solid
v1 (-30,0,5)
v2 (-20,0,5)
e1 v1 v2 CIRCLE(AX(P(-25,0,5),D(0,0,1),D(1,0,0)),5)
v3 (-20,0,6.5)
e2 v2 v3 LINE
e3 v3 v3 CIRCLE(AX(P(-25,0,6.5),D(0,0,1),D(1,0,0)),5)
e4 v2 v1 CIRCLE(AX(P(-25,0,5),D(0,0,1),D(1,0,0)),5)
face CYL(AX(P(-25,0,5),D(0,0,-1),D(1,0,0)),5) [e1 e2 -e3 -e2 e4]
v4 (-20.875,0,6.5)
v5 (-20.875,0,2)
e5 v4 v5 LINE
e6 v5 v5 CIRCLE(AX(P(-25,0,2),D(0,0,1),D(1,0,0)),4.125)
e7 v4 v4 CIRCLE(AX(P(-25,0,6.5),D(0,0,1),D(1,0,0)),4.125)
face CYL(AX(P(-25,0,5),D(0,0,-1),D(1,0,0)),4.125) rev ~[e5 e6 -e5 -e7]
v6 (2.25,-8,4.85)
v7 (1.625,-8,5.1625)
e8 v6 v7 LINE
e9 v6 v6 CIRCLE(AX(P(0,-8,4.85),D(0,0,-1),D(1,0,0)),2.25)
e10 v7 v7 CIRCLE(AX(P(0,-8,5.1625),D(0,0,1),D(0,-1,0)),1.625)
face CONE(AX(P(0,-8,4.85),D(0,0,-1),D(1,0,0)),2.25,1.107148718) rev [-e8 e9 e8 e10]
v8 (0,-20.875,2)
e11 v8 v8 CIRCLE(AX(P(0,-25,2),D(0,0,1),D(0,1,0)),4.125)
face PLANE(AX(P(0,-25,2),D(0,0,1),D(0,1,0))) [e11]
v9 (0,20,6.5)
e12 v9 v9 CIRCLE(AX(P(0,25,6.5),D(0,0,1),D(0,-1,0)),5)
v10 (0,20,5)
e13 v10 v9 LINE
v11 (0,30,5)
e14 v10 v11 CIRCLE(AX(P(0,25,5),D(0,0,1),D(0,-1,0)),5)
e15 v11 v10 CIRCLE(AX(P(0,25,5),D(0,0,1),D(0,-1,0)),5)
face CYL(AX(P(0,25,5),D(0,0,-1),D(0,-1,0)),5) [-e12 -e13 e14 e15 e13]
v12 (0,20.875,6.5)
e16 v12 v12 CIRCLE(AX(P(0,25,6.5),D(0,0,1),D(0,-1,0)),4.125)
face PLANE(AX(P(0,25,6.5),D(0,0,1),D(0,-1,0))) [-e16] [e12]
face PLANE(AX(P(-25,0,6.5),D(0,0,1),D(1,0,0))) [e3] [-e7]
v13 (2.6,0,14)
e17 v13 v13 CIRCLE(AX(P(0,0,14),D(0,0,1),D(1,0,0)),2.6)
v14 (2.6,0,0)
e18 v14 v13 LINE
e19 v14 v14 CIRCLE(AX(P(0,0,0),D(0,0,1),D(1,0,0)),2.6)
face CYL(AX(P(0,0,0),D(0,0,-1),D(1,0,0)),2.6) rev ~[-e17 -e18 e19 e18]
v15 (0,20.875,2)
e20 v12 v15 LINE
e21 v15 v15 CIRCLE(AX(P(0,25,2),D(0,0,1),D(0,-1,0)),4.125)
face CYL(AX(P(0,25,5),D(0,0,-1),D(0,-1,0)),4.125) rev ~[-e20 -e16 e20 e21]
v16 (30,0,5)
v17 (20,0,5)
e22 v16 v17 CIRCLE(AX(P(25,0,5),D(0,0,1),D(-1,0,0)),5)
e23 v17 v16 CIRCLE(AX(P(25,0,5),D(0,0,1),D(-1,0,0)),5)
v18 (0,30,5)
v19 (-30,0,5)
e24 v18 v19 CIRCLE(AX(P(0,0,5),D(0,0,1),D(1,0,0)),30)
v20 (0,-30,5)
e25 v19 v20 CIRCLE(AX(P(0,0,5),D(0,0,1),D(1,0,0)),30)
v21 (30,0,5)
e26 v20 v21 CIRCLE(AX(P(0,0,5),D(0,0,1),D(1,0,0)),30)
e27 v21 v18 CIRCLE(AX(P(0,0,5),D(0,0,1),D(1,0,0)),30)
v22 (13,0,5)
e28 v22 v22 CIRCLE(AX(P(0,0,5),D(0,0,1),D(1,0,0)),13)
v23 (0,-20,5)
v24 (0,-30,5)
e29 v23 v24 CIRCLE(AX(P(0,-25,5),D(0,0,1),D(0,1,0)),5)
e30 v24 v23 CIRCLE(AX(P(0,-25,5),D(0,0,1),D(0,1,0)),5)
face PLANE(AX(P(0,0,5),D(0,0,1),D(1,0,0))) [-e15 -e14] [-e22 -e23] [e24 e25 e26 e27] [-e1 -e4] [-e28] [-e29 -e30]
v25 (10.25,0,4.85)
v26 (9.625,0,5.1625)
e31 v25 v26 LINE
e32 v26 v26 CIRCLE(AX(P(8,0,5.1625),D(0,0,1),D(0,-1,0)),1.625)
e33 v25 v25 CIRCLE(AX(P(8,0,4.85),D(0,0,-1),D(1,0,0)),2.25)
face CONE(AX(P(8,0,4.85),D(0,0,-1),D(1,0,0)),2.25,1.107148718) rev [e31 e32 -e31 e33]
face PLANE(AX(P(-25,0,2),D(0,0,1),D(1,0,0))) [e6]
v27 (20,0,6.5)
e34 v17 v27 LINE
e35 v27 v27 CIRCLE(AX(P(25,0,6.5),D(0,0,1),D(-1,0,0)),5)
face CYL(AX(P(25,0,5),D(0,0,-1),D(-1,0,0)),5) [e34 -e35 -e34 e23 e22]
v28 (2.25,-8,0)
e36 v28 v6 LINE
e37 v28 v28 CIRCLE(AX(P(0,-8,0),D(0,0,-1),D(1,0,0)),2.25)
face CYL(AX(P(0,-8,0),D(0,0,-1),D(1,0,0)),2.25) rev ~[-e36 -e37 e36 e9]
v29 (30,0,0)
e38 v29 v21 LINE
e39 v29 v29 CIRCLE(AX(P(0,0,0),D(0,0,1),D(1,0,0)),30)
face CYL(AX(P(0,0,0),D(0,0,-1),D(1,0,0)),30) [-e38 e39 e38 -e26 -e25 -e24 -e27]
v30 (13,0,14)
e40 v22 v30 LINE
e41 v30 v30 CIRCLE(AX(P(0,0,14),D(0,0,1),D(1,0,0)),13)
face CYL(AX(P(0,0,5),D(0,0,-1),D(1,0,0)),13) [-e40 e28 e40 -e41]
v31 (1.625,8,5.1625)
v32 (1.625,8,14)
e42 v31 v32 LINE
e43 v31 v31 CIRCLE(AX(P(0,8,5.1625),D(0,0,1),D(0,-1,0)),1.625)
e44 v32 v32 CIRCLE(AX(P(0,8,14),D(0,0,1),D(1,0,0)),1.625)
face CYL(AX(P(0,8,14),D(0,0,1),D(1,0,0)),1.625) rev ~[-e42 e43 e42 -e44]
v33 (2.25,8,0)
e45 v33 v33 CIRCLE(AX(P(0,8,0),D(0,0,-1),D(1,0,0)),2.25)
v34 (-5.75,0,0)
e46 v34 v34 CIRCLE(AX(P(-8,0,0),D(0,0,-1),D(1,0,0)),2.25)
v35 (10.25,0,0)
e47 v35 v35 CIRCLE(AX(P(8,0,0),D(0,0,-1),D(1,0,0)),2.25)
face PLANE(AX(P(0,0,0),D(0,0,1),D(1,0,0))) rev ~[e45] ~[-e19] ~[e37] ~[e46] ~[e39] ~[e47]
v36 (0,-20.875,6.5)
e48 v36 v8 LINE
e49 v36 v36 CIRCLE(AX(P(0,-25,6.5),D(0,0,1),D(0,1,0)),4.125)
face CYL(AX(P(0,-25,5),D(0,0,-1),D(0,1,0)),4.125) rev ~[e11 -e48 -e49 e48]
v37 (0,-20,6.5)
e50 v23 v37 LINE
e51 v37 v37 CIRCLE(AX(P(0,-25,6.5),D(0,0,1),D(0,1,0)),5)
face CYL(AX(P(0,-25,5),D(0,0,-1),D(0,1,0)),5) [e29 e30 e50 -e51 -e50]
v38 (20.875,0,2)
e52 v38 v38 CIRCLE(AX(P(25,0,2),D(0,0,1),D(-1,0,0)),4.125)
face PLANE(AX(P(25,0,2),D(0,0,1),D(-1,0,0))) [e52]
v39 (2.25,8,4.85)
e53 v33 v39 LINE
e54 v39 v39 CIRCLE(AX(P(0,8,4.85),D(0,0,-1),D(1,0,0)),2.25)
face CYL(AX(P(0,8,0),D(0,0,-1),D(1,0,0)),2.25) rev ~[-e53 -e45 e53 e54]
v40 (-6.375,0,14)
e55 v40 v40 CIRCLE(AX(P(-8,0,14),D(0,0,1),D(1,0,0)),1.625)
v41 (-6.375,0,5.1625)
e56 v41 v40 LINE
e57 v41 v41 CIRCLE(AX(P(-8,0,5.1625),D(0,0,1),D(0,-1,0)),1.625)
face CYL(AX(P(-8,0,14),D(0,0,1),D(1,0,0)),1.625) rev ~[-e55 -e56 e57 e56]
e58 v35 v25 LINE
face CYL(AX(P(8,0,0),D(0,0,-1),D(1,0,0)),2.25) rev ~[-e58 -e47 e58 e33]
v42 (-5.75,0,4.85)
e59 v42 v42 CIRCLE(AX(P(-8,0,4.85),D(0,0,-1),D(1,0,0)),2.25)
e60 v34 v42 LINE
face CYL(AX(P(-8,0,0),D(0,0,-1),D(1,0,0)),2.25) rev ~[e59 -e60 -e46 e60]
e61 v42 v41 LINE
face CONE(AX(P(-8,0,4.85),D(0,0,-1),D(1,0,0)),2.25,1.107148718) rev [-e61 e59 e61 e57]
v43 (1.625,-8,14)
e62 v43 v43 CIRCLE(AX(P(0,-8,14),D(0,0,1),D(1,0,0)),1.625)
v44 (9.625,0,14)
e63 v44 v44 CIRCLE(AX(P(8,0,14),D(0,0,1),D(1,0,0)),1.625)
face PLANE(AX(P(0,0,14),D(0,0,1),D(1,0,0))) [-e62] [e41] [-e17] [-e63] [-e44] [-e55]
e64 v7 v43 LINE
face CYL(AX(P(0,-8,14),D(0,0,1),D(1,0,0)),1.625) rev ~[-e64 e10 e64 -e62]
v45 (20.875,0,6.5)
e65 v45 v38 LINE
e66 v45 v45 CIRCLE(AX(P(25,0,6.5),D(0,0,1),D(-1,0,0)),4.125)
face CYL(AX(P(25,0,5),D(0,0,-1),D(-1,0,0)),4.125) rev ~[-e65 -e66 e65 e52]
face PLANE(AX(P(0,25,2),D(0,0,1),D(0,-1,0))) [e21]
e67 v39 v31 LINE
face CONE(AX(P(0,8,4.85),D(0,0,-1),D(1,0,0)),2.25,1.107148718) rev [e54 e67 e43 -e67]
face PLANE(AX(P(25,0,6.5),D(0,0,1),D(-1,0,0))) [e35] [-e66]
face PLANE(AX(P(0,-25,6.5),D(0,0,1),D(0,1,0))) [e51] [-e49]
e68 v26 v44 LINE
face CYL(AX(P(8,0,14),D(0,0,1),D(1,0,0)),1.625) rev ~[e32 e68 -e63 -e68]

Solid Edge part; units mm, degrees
sketch "Sketch1" plane through (0, 0, 0) normal (0, 0, 1) x (1, 0, 0)
  circle A0 centre (0, 0) radius 30
  circle A1 centre (0, 0) radius 2.6
extrude "Protrusion1" add sketch "Sketch1" along normal blind 5
sketch "Sketch2" plane through (0, 0, 5) normal (0, 0, 1) x (1, 0, 0)
  circle A0 centre (-25, 0) radius 4.125
extrude "ExtrudedCutout_1" cut sketch "Sketch2" against normal blind 3
sketch "Sketch3" plane through (0, 0, 5) normal (0, 0, 1) x (1, 0, 0)
  circle A0 centre (-25, 0) radius 5
  circle A1 centre (-25, 0) radius 4.125
  dimension "D1" = 25
extrude "ExtrudedProtrusion_2" add sketch "Sketch3" along normal blind 1.5
sketch "Sketch4" plane through (0, 0, 5) normal (0, 0, 1) x (1, 0, 0)
  circle A0 centre (0, 0) radius 2.6
  circle A1 centre (0, 0) radius 13
extrude "ExtrudedProtrusion_3" add sketch "Sketch4" along normal blind 9
pattern_circular "Pattern1" count 4 over 360 about axis through (0, 0, 0) along (0, 0, -1) of "ExtrudedCutout_1", "ExtrudedProtrusion_2"
sketch "Sketch5" plane through (0, 0, 14) normal (0, 0, 1) x (1, 0, 0)
  circle A0 centre (-8, 0) radius 1.625
  circle A1 centre (0, 8) radius 1.625
  circle A2 centre (8, 0) radius 1.625
  circle A3 centre (0, -8) radius 1.625
  dimension "D1" = 8
  dimension "D2" = 8
  dimension "D3" = 8
  dimension "D4" = 8
extrude "Cutout1" cut sketch "Sketch5" against normal up to next
sketch "Sketch6" plane through (0, 0, 0) normal (0, 0, -1) x (1, 0, 0)
  circle A0 centre (8, 0) radius 2.25
  circle A1 centre (8, 0) radius 1.625
  circle A2 centre (0, -8) radius 2.25
  circle A3 centre (0, -8) radius 1.625
  circle A4 centre (0, 8) radius 2.25
  circle A5 centre (0, 8) radius 1.625
  circle A6 centre (-8, 0) radius 2.25
  circle A7 centre (-8, 0) radius 1.625
extrude "Cutout2" cut sketch "Sketch6" against normal blind 5.25
chamfer "Chamfer_3" distance 0.8 distance2 0.4 4 edges at (-2.25, -8, 5.25) (5.75, 0, 5.25) (-2.25, 8, 5.25) (-10.25, 0, 5.25) measured on face at (1.545, -9.455, 5.25) measured on face at (-6.455, -1.455, 5.25) measured on face at (9.545, -1.455, 5.25) measured on face at (1.545, 6.545, 5.25) measured on face at (1.545, -9.455, 5.25) measured on face at (-6.455, -1.455, 5.25) measured on face at (9.545, -1.455, 5.25) measured on face at (1.545, 6.545, 5.25) measured on face at (1.545, -9.455, 5.25) measured on face at (-6.455, -1.455, 5.25) measured on face at (9.545, -1.455, 5.25) measured on face at (1.545, 6.545, 5.25) measured on face at (1.545, -9.455, 5.25) measured on face at (-6.455, -1.455, 5.25) measured on face at (9.545, -1.455, 5.25) measured on face at (1.545, 6.545, 5.25)
